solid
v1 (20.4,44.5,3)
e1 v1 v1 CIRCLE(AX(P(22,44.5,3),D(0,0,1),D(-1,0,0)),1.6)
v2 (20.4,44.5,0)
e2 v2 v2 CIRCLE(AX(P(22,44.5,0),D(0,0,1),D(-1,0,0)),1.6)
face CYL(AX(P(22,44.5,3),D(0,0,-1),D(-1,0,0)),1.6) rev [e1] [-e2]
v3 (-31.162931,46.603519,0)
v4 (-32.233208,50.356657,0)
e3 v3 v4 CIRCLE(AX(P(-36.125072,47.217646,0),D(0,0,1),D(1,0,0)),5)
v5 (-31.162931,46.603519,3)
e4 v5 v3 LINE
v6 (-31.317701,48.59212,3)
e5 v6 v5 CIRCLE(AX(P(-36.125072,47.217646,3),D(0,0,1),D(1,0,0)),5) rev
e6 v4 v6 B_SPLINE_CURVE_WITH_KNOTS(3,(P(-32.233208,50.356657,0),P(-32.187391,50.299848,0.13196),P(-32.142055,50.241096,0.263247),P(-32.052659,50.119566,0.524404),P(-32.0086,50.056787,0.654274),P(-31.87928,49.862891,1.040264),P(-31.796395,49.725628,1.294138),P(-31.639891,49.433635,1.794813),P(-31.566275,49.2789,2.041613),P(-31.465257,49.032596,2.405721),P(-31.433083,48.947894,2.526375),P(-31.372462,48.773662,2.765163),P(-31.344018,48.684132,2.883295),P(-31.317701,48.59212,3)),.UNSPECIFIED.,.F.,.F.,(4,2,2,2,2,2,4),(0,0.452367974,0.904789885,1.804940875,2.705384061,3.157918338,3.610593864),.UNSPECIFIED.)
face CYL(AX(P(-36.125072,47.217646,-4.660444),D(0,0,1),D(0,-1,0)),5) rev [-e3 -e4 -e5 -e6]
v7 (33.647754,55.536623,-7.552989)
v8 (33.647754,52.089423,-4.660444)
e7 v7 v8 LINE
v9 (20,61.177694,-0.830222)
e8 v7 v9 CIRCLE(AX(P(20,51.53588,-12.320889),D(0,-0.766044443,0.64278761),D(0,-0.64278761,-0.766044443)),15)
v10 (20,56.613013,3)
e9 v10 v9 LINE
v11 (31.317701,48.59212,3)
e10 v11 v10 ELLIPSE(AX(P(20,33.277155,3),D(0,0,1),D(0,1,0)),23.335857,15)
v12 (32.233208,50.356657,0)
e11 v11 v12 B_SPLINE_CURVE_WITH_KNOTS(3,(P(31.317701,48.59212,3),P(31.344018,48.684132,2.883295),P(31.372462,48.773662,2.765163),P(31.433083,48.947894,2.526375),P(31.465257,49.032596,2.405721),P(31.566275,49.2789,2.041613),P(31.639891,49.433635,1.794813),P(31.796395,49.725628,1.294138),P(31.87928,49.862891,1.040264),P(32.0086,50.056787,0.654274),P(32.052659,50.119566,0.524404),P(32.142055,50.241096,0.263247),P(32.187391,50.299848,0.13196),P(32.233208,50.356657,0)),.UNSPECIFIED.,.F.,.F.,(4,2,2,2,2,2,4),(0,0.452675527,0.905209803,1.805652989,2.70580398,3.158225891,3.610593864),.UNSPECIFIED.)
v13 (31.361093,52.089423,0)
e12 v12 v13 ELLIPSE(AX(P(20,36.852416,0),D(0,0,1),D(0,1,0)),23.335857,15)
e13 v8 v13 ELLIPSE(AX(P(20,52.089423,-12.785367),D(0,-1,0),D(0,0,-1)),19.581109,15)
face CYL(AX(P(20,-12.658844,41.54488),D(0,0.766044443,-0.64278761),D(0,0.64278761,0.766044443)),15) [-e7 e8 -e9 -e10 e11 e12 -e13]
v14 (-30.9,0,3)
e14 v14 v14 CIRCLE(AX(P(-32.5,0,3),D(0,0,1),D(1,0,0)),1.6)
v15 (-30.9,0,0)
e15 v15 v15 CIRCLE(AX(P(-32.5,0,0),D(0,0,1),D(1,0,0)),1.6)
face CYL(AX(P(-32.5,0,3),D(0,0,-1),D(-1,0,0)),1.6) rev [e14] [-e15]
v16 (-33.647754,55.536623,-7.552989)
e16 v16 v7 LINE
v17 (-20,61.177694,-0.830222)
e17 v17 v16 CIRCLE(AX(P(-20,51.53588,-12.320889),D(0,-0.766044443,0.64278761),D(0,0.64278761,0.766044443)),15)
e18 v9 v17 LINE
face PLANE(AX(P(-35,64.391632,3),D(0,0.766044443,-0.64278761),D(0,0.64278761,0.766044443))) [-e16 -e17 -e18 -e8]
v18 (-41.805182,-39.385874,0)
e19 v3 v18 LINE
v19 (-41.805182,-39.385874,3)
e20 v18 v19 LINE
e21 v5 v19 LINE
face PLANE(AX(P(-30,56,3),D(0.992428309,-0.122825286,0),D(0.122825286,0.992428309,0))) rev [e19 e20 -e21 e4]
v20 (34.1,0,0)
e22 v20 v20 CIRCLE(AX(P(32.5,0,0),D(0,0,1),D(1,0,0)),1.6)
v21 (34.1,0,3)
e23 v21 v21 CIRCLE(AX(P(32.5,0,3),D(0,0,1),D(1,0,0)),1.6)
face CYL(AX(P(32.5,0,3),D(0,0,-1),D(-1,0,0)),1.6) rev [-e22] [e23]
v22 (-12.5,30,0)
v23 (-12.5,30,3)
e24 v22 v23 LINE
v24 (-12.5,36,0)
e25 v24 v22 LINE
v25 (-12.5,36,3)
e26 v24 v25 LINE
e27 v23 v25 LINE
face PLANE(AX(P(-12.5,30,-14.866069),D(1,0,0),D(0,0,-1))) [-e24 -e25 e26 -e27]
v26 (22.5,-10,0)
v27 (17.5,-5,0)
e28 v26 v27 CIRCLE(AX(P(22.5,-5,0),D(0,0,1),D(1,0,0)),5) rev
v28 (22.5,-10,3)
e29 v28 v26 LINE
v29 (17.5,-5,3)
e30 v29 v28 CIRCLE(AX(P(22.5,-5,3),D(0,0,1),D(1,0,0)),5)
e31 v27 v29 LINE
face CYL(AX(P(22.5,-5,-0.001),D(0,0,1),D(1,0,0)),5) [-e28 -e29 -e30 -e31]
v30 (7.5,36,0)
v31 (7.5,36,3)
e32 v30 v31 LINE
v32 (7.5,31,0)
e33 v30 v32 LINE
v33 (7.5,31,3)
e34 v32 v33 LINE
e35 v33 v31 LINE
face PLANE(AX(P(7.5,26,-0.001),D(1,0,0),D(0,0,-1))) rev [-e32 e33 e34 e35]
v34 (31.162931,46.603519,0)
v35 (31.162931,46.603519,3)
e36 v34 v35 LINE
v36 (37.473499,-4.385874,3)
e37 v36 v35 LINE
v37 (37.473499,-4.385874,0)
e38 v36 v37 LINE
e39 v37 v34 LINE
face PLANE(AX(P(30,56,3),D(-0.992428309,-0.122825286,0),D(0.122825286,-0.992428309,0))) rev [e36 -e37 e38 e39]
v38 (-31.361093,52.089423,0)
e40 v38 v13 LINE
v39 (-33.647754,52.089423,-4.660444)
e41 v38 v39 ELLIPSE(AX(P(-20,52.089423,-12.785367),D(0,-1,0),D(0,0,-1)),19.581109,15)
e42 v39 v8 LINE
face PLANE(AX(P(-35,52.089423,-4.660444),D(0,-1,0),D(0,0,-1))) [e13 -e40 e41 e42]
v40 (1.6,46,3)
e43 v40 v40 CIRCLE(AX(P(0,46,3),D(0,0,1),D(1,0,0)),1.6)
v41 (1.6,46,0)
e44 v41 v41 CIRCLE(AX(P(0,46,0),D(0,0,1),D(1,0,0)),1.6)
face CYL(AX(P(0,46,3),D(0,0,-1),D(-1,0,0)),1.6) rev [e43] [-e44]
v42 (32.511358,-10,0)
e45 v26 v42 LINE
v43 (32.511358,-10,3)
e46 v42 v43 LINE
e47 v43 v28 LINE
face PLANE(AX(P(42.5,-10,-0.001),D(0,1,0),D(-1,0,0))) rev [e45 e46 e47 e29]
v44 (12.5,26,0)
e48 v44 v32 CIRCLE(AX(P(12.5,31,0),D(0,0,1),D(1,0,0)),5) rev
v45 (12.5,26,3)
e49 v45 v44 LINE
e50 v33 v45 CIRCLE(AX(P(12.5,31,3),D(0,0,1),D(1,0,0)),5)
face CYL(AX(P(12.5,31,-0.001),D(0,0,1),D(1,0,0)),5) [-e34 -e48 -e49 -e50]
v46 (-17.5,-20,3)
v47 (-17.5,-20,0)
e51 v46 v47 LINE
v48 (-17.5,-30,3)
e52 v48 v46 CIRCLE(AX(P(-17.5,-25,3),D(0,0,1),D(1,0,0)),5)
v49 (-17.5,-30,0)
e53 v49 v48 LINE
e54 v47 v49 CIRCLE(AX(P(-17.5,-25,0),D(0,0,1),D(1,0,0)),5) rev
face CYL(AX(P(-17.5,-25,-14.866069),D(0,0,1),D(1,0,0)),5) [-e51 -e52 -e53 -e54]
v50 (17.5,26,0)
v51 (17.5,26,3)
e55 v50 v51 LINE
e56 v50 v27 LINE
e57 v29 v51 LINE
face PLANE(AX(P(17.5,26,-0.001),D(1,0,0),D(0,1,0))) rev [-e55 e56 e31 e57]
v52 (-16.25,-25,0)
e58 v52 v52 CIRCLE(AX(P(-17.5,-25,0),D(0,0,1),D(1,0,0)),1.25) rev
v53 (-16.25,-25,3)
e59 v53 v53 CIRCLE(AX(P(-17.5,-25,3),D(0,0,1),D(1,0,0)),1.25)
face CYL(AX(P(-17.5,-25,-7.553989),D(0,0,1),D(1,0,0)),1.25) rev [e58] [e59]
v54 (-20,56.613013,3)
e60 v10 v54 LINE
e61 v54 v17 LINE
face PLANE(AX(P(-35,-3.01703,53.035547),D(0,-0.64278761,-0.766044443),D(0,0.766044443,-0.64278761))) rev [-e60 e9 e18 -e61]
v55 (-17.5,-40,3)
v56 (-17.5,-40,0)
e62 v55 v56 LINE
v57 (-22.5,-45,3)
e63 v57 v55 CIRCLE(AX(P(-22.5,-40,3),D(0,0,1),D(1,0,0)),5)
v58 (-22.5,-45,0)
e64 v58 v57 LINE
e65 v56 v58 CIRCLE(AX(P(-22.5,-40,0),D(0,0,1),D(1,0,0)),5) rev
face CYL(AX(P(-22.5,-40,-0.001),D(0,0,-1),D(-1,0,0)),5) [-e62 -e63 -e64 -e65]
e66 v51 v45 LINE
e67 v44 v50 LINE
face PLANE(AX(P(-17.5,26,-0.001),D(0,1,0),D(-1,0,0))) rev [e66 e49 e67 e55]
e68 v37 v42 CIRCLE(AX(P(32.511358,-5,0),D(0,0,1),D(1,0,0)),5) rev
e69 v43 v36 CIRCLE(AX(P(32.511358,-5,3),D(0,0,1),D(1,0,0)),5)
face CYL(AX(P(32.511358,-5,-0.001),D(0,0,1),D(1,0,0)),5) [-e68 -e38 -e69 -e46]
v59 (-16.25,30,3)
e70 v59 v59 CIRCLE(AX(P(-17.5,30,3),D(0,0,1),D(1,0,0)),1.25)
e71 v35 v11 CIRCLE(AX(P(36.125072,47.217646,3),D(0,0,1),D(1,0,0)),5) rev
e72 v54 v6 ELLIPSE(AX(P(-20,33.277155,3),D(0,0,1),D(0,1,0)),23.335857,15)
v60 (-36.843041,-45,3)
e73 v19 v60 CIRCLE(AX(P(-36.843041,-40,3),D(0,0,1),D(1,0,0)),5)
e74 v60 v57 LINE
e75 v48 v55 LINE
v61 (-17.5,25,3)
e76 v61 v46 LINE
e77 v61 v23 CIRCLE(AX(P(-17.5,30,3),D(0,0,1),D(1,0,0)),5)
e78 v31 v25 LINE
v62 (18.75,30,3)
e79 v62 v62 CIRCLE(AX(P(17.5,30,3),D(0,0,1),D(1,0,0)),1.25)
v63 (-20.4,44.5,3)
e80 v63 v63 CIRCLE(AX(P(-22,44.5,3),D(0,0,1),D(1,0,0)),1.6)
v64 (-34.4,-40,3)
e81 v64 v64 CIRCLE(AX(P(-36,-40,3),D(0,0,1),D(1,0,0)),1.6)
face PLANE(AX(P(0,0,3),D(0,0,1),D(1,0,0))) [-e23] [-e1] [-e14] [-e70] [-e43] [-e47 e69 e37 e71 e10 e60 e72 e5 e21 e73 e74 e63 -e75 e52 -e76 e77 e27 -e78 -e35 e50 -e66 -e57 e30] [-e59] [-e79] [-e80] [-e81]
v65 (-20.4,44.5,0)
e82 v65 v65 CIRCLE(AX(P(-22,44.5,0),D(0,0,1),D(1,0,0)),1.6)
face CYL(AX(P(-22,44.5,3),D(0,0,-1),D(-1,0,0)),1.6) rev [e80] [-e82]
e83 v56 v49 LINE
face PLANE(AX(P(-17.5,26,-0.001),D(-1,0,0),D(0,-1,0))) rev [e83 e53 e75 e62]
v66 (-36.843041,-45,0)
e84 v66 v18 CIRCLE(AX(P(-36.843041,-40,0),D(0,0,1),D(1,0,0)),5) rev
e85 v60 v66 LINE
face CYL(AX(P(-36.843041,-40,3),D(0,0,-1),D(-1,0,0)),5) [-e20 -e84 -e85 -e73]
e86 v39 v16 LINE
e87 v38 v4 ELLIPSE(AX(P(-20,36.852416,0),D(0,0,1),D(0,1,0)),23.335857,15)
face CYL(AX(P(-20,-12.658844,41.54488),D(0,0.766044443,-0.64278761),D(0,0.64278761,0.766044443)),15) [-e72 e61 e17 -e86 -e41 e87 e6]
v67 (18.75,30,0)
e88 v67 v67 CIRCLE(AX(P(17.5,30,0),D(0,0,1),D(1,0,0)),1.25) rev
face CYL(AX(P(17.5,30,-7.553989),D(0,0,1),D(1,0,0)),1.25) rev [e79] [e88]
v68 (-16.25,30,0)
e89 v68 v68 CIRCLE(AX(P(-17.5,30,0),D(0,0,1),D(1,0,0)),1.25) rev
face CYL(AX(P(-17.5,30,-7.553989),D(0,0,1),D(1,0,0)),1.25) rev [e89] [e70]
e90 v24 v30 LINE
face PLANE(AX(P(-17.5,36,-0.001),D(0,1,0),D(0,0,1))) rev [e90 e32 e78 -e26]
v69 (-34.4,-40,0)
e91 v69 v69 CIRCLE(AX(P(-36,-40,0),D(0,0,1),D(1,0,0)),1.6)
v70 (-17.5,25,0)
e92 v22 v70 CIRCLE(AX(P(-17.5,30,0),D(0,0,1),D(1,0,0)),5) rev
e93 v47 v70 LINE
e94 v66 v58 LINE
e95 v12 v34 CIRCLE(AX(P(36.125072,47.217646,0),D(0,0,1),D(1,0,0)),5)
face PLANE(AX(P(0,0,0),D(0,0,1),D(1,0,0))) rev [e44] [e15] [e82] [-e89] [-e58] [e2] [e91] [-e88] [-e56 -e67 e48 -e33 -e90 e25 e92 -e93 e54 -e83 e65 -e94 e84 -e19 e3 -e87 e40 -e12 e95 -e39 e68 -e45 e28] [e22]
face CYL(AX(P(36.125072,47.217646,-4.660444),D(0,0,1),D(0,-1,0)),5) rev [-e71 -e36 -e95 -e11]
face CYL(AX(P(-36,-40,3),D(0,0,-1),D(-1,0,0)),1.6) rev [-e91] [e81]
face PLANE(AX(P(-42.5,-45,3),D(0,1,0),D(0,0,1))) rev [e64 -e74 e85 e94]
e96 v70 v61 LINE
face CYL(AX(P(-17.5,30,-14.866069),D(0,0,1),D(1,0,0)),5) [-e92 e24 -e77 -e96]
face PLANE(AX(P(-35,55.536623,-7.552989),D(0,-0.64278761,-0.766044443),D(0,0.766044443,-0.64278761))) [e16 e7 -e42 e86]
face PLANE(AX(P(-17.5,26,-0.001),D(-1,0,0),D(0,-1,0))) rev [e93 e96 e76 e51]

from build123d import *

# Parameters (mm, degrees)
SKETCH_1_R                  = 1.6
EXTRUDE_1_DEPTH             = 3
CUT_EXTRUDE_1_REACH         = 72.365
SKETCH_2_W                  = 30
SKETCH_2_H                  = 35
CUT_EXTRUDE_2_REACH         = 72.365
SKETCH_3_W                  = 35
SKETCH_3_H                  = 55
CUT_EXTRUDE_3_REACH         = 72.365
SKETCH_4_W                  = 25
SKETCH_4_H                  = 10
EXTRUDE_2_REACH             = 72.365
EXTRUDE_2_DIRECTION_2_REACH = 72.365
EXTRUDE_3_DEPTH             = 35
EXTRUDE_3_DEPTH_BACK        = 35
FILLET_1_R                  = 5
CUT_EXTRUDE_5_REACH         = 99.66
SKETCH_8_W                  = 70
SKETCH_8_H                  = 5
CUT_EXTRUDE_4_REACH         = 99.66
CUT_EXTRUDE_6_REACH         = 101.977
SKETCH_9_W                  = 30
SKETCH_9_H                  = 3
FILLET_2_R                  = 5
CUT_EXTRUDE_7_REACH         = 76.866
SKETCH_10_R                 = 1.25
SKETCH_11_R                 = 5
SKETCH_11_R_2               = 1.25
EXTRUDE_4_DEPTH             = 3


with BuildPart() as part:
    # 草图1 → 凸台-拉伸1 (new body)
    with BuildSketch(Plane.XY):
        Polygon((-30, 56), (30, 56), (42.5, -45), (-42.5, -45), align=None)
        with Locations((-32.5, 0)):
            Circle(SKETCH_1_R, mode=Mode.SUBTRACT)
        with Locations((32.5, 0)):
            Circle(SKETCH_1_R, mode=Mode.SUBTRACT)
        with Locations((-22, 44.5)):
            Circle(SKETCH_1_R, mode=Mode.SUBTRACT)
        with Locations(Location((22, 44.5, 0), (0, 0, 180))):
            Circle(SKETCH_1_R, mode=Mode.SUBTRACT)
        with Locations((0, 46)):
            Circle(SKETCH_1_R, mode=Mode.SUBTRACT)
        with Locations((-36, -40)):
            Circle(SKETCH_1_R, mode=Mode.SUBTRACT)
    extrude(amount=EXTRUDE_1_DEPTH)

    # 草图2 → 切除-拉伸1 (cut, up to next)
    with BuildSketch(Plane.XY.offset(3), mode=Mode.PRIVATE) as cut_extrude_1_sk1:
        with Locations((27.5, -27.5)):
            Rectangle(SKETCH_2_W, SKETCH_2_H)
    cut_extrude_1_tool1 = extrude(cut_extrude_1_sk1.sketch, amount=-CUT_EXTRUDE_1_REACH, mode=Mode.PRIVATE) & part.part
    add(cut_extrude_1_tool1.solids().sort_by_distance((27.5, -27.5, 3))[0], mode=Mode.SUBTRACT)

    # 草图3 → 切除-拉伸2 (cut, up to next)
    with BuildSketch(Plane.XY.offset(3), mode=Mode.PRIVATE) as cut_extrude_2_sk1:
        with Locations((0, -1.5)):
            Rectangle(SKETCH_3_W, SKETCH_3_H)
    cut_extrude_2_tool1 = extrude(cut_extrude_2_sk1.sketch, amount=-CUT_EXTRUDE_2_REACH, mode=Mode.PRIVATE) & part.part
    add(cut_extrude_2_tool1.solids().sort_by_distance((0, -1.5, 3))[0], mode=Mode.SUBTRACT)

    # 草图4 → 切除-拉伸3 (cut, up to next)
    with BuildSketch(Plane.XY.offset(3), mode=Mode.PRIVATE) as cut_extrude_3_sk1:
        with Locations((-5, 31)):
            Rectangle(SKETCH_4_W, SKETCH_4_H)
    cut_extrude_3_tool1 = extrude(cut_extrude_3_sk1.sketch, amount=-CUT_EXTRUDE_3_REACH, mode=Mode.PRIVATE) & part.part
    add(cut_extrude_3_tool1.solids().sort_by_distance((-5, 31, 3))[0], mode=Mode.SUBTRACT)

    # 凸台-拉伸2: up to this plane
    extrude_2_end = Plane(origin=(30, 56, 3), z_dir=(-0.9924283093332451, -0.12282528580856998, 0))
    # 草图5 → 凸台-拉伸2 (add, up to the surface)
    with BuildSketch(Plane(origin=(0, 0, 0), x_dir=(0, 0, -1), z_dir=(1, 0, 0)), mode=Mode.PRIVATE) as extrude_2_sk1:
        Polygon((0, 56), (-3, 58.517298894), (-3, 56), align=None)
    extrude_2_tool1 = split(extrude(extrude_2_sk1.sketch, amount=EXTRUDE_2_REACH, mode=Mode.PRIVATE), bisect_by=extrude_2_end, keep=Keep.BOTH, mode=Mode.PRIVATE)
    add(extrude_2_tool1.solids().sort_by_distance((0, 56.8391, 2))[0])

    # 凸台-拉伸2 direction 2: up to this plane
    extrude_2_direction_2_end = Plane(origin=(-30, 56, 3), z_dir=(0.9924283093332451, -0.12282528580856998, 0))
    # 草图5 → 凸台-拉伸2 direction 2 (add, up to the surface)
    with BuildSketch(Plane(origin=(0, 0, 0), x_dir=(0, 0, -1), z_dir=(1, 0, 0)), mode=Mode.PRIVATE) as extrude_2_direction_2_sk1:
        Polygon((0, 56), (-3, 58.517298894), (-3, 56), align=None)
    extrude_2_direction_2_tool1 = split(extrude(extrude_2_direction_2_sk1.sketch, amount=-EXTRUDE_2_DIRECTION_2_REACH, mode=Mode.PRIVATE), bisect_by=extrude_2_direction_2_end, keep=Keep.BOTH, mode=Mode.PRIVATE)
    add(extrude_2_direction_2_tool1.solids().sort_by_distance((0, 56.8391, 2))[0])

    # 草图6 → 凸台-拉伸3 (add, two sides: drawn at the far end of the back side and taken through both)
    with BuildSketch(Plane(origin=(0, 0, 0), x_dir=(0, 0, -1), z_dir=(1, 0, 0)).offset(-EXTRUDE_3_DEPTH_BACK)):
        Polygon((-3, 58.517298894), (-3, 64.391631696), (7.552988675, 55.536622791), (4.660444431, 52.089422797), (-3, 52.089422797), align=None)
    extrude(amount=EXTRUDE_3_DEPTH + EXTRUDE_3_DEPTH_BACK)

    # 圆角1
    # the kernel refuses this fillet: 5 mm, written as the material it adds along each edge
    with BuildSketch(Plane(origin=(-30.483982327, 52.089422797, 3), x_dir=(-1, 0, 0), z_dir=(0, 0, -1)), Plane(origin=(30.483982327, 52.089422797, 0), x_dir=(1, 0, 0), z_dir=(0, 0, 1))) as fillet_1_piece_1:
        with BuildLine():
            CenterArc((5.641090005, -4.871777114), FILLET_1_R, 103.003728842, 84.05145722)
            Line((0.678948458, -5.485903543), (0.579705627, -5.498186072))
            Line((0.579705627, -5.498186072), (-0.099242831, -0.012282529))
            Line((-0.099242831, -0.012282529), (0, 0.1))
            ThreePointArc((0, 0.1), (2.258008836, 0.1), (4.493516226, 0.097435542))
            Line((4.493516226, 0.097435542), (4.516017673, 0))
        make_face()
    extrude(amount=3)

    # 草图8 → 切除-拉伸5 (cut, up to next)
    with BuildSketch(Plane(origin=(0, 36.309348969, -30.467161328), x_dir=(1, 0, 0), z_dir=(0, 0.7660444431189815, -0.6427876096865354)), mode=Mode.PRIVATE) as cut_extrude_5_sk1:
        with Locations((0, -41.188276351)):
            Rectangle(SKETCH_8_W, SKETCH_8_H)
    cut_extrude_5_tool1 = extrude(cut_extrude_5_sk1.sketch, amount=-CUT_EXTRUDE_5_REACH, mode=Mode.PRIVATE) & part.part
    add(cut_extrude_5_tool1.solids().sort_by_distance((0, 62.784663, 1.084889))[0], mode=Mode.SUBTRACT)

    # 草图7 → 切除-拉伸4 (cut, up to next)
    with BuildSketch(Plane(origin=(0, 36.309348969, -30.467161328), x_dir=(1, 0, 0), z_dir=(0, 0.7660444431189815, -0.6427876096865354)), mode=Mode.PRIVATE) as cut_extrude_4_sk1:
        with BuildLine():
            Line((-35, -23.688276351), (-35, -38.688276351))
            Line((-35, -38.688276351), (-20, -38.688276351))
            ThreePointArc((-20, -38.688276351), (-30.606601718, -34.294878069), (-35, -23.688276351))
        make_face()
    cut_extrude_4_tool1 = extrude(cut_extrude_4_sk1.sketch, amount=-CUT_EXTRUDE_4_REACH, mode=Mode.PRIVATE) & part.part
    # 草图7 → 切除-拉伸4 (cut, up to next)
    with BuildSketch(Plane(origin=(0, 36.309348969, -30.467161328), x_dir=(1, 0, 0), z_dir=(0, 0.7660444431189815, -0.6427876096865354)), mode=Mode.PRIVATE) as cut_extrude_4_sk2:
        with BuildLine():
            Line((35, -38.688276351), (20, -38.688276351))
            ThreePointArc((20, -38.688276351), (30.606601718, -34.294878069), (35, -23.688276351))
            Line((35, -23.688276351), (35, -38.688276351))
        make_face()
    cut_extrude_4_tool2 = extrude(cut_extrude_4_sk2.sketch, amount=-CUT_EXTRUDE_4_REACH, mode=Mode.PRIVATE) & part.part
    add(cut_extrude_4_tool1.solids().sort_by_distance((-31.649481, 59.024021, -3.396869))[0], mode=Mode.SUBTRACT)
    add(cut_extrude_4_tool2.solids().sort_by_distance((31.649481, 59.024021, -3.396869))[0], mode=Mode.SUBTRACT)

    # 草图9 → 切除-拉伸6 (cut, up to next)
    with BuildSketch(Plane(origin=(0, -29, 0), x_dir=(1, 0, 0), z_dir=(0, 1, 0)), mode=Mode.PRIVATE) as cut_extrude_6_sk1:
        with Locations((-2.5, -1.5)):
            Rectangle(SKETCH_9_W, SKETCH_9_H)
    cut_extrude_6_tool1 = extrude(cut_extrude_6_sk1.sketch, amount=-CUT_EXTRUDE_6_REACH, mode=Mode.PRIVATE) & part.part
    add(cut_extrude_6_tool1.solids().sort_by_distance((-2.5, -29, 1.5))[0], mode=Mode.SUBTRACT)

    # 圆角2
    fillet_2_edges = [part.edges().sort_by_distance(p)[0] for p in [
        (-17.5, -45, 1.5),
        (38.168316832, -10, 1.5),
        (17.5, -10, 1.5),
        (7.5, 26, 1.5),
        (-42.5, -45, 1.5),
    ]]
    fillet(fillet_2_edges, radius=FILLET_2_R)

    # 草图10 → 切除-拉伸7 (cut, up to next)
    with BuildSketch(Plane.XY.offset(3), mode=Mode.PRIVATE) as cut_extrude_7_sk1:
        with Locations((17.5, 30)):
            Circle(SKETCH_10_R)
    cut_extrude_7_tool1 = extrude(cut_extrude_7_sk1.sketch, amount=-CUT_EXTRUDE_7_REACH, mode=Mode.PRIVATE) & part.part
    # 草图10 → 切除-拉伸7 (cut, up to next)
    with BuildSketch(Plane.XY.offset(3), mode=Mode.PRIVATE) as cut_extrude_7_sk2:
        with Locations((-17.5, 30)):
            Circle(SKETCH_10_R)
    cut_extrude_7_tool2 = extrude(cut_extrude_7_sk2.sketch, amount=-CUT_EXTRUDE_7_REACH, mode=Mode.PRIVATE) & part.part
    # 草图10 → 切除-拉伸7 (cut, up to next)
    with BuildSketch(Plane.XY.offset(3), mode=Mode.PRIVATE) as cut_extrude_7_sk3:
        with Locations((-17.5, -25)):
            Circle(SKETCH_10_R)
    cut_extrude_7_tool3 = extrude(cut_extrude_7_sk3.sketch, amount=-CUT_EXTRUDE_7_REACH, mode=Mode.PRIVATE) & part.part
    add(cut_extrude_7_tool1.solids().sort_by_distance((17.5, 30, 3))[0], mode=Mode.SUBTRACT)
    add(cut_extrude_7_tool2.solids().sort_by_distance((-17.5, 30, 3))[0], mode=Mode.SUBTRACT)
    add(cut_extrude_7_tool3.solids().sort_by_distance((-17.5, -25, 3))[0], mode=Mode.SUBTRACT)

    # 草图11 → 凸台-拉伸4 (add)
    # profile 1 of 2: a face of its own
    with BuildSketch(Plane.XY.offset(3)):
        with Locations((-17.5, -25)):
            Circle(SKETCH_11_R)
        with Locations((-17.5, -25)):
            Circle(SKETCH_11_R_2, mode=Mode.SUBTRACT)
    # profile 2 of 2: a face of its own
    with BuildSketch(Plane.XY.offset(3)):
        with BuildLine():
            Line((-12.5, 30), (-12.5, 36))
            Line((-12.5, 36), (-17.5, 36))
            Line((-17.5, 36), (-17.5, 35))
            ThreePointArc((-17.5, 35), (-21.035533906, 26.464466094), (-12.5, 30))
        make_face()
        with Locations((-17.5, 30)):
            Circle(SKETCH_11_R_2, mode=Mode.SUBTRACT)
    extrude(amount=-EXTRUDE_4_DEPTH)


solid = part.part
